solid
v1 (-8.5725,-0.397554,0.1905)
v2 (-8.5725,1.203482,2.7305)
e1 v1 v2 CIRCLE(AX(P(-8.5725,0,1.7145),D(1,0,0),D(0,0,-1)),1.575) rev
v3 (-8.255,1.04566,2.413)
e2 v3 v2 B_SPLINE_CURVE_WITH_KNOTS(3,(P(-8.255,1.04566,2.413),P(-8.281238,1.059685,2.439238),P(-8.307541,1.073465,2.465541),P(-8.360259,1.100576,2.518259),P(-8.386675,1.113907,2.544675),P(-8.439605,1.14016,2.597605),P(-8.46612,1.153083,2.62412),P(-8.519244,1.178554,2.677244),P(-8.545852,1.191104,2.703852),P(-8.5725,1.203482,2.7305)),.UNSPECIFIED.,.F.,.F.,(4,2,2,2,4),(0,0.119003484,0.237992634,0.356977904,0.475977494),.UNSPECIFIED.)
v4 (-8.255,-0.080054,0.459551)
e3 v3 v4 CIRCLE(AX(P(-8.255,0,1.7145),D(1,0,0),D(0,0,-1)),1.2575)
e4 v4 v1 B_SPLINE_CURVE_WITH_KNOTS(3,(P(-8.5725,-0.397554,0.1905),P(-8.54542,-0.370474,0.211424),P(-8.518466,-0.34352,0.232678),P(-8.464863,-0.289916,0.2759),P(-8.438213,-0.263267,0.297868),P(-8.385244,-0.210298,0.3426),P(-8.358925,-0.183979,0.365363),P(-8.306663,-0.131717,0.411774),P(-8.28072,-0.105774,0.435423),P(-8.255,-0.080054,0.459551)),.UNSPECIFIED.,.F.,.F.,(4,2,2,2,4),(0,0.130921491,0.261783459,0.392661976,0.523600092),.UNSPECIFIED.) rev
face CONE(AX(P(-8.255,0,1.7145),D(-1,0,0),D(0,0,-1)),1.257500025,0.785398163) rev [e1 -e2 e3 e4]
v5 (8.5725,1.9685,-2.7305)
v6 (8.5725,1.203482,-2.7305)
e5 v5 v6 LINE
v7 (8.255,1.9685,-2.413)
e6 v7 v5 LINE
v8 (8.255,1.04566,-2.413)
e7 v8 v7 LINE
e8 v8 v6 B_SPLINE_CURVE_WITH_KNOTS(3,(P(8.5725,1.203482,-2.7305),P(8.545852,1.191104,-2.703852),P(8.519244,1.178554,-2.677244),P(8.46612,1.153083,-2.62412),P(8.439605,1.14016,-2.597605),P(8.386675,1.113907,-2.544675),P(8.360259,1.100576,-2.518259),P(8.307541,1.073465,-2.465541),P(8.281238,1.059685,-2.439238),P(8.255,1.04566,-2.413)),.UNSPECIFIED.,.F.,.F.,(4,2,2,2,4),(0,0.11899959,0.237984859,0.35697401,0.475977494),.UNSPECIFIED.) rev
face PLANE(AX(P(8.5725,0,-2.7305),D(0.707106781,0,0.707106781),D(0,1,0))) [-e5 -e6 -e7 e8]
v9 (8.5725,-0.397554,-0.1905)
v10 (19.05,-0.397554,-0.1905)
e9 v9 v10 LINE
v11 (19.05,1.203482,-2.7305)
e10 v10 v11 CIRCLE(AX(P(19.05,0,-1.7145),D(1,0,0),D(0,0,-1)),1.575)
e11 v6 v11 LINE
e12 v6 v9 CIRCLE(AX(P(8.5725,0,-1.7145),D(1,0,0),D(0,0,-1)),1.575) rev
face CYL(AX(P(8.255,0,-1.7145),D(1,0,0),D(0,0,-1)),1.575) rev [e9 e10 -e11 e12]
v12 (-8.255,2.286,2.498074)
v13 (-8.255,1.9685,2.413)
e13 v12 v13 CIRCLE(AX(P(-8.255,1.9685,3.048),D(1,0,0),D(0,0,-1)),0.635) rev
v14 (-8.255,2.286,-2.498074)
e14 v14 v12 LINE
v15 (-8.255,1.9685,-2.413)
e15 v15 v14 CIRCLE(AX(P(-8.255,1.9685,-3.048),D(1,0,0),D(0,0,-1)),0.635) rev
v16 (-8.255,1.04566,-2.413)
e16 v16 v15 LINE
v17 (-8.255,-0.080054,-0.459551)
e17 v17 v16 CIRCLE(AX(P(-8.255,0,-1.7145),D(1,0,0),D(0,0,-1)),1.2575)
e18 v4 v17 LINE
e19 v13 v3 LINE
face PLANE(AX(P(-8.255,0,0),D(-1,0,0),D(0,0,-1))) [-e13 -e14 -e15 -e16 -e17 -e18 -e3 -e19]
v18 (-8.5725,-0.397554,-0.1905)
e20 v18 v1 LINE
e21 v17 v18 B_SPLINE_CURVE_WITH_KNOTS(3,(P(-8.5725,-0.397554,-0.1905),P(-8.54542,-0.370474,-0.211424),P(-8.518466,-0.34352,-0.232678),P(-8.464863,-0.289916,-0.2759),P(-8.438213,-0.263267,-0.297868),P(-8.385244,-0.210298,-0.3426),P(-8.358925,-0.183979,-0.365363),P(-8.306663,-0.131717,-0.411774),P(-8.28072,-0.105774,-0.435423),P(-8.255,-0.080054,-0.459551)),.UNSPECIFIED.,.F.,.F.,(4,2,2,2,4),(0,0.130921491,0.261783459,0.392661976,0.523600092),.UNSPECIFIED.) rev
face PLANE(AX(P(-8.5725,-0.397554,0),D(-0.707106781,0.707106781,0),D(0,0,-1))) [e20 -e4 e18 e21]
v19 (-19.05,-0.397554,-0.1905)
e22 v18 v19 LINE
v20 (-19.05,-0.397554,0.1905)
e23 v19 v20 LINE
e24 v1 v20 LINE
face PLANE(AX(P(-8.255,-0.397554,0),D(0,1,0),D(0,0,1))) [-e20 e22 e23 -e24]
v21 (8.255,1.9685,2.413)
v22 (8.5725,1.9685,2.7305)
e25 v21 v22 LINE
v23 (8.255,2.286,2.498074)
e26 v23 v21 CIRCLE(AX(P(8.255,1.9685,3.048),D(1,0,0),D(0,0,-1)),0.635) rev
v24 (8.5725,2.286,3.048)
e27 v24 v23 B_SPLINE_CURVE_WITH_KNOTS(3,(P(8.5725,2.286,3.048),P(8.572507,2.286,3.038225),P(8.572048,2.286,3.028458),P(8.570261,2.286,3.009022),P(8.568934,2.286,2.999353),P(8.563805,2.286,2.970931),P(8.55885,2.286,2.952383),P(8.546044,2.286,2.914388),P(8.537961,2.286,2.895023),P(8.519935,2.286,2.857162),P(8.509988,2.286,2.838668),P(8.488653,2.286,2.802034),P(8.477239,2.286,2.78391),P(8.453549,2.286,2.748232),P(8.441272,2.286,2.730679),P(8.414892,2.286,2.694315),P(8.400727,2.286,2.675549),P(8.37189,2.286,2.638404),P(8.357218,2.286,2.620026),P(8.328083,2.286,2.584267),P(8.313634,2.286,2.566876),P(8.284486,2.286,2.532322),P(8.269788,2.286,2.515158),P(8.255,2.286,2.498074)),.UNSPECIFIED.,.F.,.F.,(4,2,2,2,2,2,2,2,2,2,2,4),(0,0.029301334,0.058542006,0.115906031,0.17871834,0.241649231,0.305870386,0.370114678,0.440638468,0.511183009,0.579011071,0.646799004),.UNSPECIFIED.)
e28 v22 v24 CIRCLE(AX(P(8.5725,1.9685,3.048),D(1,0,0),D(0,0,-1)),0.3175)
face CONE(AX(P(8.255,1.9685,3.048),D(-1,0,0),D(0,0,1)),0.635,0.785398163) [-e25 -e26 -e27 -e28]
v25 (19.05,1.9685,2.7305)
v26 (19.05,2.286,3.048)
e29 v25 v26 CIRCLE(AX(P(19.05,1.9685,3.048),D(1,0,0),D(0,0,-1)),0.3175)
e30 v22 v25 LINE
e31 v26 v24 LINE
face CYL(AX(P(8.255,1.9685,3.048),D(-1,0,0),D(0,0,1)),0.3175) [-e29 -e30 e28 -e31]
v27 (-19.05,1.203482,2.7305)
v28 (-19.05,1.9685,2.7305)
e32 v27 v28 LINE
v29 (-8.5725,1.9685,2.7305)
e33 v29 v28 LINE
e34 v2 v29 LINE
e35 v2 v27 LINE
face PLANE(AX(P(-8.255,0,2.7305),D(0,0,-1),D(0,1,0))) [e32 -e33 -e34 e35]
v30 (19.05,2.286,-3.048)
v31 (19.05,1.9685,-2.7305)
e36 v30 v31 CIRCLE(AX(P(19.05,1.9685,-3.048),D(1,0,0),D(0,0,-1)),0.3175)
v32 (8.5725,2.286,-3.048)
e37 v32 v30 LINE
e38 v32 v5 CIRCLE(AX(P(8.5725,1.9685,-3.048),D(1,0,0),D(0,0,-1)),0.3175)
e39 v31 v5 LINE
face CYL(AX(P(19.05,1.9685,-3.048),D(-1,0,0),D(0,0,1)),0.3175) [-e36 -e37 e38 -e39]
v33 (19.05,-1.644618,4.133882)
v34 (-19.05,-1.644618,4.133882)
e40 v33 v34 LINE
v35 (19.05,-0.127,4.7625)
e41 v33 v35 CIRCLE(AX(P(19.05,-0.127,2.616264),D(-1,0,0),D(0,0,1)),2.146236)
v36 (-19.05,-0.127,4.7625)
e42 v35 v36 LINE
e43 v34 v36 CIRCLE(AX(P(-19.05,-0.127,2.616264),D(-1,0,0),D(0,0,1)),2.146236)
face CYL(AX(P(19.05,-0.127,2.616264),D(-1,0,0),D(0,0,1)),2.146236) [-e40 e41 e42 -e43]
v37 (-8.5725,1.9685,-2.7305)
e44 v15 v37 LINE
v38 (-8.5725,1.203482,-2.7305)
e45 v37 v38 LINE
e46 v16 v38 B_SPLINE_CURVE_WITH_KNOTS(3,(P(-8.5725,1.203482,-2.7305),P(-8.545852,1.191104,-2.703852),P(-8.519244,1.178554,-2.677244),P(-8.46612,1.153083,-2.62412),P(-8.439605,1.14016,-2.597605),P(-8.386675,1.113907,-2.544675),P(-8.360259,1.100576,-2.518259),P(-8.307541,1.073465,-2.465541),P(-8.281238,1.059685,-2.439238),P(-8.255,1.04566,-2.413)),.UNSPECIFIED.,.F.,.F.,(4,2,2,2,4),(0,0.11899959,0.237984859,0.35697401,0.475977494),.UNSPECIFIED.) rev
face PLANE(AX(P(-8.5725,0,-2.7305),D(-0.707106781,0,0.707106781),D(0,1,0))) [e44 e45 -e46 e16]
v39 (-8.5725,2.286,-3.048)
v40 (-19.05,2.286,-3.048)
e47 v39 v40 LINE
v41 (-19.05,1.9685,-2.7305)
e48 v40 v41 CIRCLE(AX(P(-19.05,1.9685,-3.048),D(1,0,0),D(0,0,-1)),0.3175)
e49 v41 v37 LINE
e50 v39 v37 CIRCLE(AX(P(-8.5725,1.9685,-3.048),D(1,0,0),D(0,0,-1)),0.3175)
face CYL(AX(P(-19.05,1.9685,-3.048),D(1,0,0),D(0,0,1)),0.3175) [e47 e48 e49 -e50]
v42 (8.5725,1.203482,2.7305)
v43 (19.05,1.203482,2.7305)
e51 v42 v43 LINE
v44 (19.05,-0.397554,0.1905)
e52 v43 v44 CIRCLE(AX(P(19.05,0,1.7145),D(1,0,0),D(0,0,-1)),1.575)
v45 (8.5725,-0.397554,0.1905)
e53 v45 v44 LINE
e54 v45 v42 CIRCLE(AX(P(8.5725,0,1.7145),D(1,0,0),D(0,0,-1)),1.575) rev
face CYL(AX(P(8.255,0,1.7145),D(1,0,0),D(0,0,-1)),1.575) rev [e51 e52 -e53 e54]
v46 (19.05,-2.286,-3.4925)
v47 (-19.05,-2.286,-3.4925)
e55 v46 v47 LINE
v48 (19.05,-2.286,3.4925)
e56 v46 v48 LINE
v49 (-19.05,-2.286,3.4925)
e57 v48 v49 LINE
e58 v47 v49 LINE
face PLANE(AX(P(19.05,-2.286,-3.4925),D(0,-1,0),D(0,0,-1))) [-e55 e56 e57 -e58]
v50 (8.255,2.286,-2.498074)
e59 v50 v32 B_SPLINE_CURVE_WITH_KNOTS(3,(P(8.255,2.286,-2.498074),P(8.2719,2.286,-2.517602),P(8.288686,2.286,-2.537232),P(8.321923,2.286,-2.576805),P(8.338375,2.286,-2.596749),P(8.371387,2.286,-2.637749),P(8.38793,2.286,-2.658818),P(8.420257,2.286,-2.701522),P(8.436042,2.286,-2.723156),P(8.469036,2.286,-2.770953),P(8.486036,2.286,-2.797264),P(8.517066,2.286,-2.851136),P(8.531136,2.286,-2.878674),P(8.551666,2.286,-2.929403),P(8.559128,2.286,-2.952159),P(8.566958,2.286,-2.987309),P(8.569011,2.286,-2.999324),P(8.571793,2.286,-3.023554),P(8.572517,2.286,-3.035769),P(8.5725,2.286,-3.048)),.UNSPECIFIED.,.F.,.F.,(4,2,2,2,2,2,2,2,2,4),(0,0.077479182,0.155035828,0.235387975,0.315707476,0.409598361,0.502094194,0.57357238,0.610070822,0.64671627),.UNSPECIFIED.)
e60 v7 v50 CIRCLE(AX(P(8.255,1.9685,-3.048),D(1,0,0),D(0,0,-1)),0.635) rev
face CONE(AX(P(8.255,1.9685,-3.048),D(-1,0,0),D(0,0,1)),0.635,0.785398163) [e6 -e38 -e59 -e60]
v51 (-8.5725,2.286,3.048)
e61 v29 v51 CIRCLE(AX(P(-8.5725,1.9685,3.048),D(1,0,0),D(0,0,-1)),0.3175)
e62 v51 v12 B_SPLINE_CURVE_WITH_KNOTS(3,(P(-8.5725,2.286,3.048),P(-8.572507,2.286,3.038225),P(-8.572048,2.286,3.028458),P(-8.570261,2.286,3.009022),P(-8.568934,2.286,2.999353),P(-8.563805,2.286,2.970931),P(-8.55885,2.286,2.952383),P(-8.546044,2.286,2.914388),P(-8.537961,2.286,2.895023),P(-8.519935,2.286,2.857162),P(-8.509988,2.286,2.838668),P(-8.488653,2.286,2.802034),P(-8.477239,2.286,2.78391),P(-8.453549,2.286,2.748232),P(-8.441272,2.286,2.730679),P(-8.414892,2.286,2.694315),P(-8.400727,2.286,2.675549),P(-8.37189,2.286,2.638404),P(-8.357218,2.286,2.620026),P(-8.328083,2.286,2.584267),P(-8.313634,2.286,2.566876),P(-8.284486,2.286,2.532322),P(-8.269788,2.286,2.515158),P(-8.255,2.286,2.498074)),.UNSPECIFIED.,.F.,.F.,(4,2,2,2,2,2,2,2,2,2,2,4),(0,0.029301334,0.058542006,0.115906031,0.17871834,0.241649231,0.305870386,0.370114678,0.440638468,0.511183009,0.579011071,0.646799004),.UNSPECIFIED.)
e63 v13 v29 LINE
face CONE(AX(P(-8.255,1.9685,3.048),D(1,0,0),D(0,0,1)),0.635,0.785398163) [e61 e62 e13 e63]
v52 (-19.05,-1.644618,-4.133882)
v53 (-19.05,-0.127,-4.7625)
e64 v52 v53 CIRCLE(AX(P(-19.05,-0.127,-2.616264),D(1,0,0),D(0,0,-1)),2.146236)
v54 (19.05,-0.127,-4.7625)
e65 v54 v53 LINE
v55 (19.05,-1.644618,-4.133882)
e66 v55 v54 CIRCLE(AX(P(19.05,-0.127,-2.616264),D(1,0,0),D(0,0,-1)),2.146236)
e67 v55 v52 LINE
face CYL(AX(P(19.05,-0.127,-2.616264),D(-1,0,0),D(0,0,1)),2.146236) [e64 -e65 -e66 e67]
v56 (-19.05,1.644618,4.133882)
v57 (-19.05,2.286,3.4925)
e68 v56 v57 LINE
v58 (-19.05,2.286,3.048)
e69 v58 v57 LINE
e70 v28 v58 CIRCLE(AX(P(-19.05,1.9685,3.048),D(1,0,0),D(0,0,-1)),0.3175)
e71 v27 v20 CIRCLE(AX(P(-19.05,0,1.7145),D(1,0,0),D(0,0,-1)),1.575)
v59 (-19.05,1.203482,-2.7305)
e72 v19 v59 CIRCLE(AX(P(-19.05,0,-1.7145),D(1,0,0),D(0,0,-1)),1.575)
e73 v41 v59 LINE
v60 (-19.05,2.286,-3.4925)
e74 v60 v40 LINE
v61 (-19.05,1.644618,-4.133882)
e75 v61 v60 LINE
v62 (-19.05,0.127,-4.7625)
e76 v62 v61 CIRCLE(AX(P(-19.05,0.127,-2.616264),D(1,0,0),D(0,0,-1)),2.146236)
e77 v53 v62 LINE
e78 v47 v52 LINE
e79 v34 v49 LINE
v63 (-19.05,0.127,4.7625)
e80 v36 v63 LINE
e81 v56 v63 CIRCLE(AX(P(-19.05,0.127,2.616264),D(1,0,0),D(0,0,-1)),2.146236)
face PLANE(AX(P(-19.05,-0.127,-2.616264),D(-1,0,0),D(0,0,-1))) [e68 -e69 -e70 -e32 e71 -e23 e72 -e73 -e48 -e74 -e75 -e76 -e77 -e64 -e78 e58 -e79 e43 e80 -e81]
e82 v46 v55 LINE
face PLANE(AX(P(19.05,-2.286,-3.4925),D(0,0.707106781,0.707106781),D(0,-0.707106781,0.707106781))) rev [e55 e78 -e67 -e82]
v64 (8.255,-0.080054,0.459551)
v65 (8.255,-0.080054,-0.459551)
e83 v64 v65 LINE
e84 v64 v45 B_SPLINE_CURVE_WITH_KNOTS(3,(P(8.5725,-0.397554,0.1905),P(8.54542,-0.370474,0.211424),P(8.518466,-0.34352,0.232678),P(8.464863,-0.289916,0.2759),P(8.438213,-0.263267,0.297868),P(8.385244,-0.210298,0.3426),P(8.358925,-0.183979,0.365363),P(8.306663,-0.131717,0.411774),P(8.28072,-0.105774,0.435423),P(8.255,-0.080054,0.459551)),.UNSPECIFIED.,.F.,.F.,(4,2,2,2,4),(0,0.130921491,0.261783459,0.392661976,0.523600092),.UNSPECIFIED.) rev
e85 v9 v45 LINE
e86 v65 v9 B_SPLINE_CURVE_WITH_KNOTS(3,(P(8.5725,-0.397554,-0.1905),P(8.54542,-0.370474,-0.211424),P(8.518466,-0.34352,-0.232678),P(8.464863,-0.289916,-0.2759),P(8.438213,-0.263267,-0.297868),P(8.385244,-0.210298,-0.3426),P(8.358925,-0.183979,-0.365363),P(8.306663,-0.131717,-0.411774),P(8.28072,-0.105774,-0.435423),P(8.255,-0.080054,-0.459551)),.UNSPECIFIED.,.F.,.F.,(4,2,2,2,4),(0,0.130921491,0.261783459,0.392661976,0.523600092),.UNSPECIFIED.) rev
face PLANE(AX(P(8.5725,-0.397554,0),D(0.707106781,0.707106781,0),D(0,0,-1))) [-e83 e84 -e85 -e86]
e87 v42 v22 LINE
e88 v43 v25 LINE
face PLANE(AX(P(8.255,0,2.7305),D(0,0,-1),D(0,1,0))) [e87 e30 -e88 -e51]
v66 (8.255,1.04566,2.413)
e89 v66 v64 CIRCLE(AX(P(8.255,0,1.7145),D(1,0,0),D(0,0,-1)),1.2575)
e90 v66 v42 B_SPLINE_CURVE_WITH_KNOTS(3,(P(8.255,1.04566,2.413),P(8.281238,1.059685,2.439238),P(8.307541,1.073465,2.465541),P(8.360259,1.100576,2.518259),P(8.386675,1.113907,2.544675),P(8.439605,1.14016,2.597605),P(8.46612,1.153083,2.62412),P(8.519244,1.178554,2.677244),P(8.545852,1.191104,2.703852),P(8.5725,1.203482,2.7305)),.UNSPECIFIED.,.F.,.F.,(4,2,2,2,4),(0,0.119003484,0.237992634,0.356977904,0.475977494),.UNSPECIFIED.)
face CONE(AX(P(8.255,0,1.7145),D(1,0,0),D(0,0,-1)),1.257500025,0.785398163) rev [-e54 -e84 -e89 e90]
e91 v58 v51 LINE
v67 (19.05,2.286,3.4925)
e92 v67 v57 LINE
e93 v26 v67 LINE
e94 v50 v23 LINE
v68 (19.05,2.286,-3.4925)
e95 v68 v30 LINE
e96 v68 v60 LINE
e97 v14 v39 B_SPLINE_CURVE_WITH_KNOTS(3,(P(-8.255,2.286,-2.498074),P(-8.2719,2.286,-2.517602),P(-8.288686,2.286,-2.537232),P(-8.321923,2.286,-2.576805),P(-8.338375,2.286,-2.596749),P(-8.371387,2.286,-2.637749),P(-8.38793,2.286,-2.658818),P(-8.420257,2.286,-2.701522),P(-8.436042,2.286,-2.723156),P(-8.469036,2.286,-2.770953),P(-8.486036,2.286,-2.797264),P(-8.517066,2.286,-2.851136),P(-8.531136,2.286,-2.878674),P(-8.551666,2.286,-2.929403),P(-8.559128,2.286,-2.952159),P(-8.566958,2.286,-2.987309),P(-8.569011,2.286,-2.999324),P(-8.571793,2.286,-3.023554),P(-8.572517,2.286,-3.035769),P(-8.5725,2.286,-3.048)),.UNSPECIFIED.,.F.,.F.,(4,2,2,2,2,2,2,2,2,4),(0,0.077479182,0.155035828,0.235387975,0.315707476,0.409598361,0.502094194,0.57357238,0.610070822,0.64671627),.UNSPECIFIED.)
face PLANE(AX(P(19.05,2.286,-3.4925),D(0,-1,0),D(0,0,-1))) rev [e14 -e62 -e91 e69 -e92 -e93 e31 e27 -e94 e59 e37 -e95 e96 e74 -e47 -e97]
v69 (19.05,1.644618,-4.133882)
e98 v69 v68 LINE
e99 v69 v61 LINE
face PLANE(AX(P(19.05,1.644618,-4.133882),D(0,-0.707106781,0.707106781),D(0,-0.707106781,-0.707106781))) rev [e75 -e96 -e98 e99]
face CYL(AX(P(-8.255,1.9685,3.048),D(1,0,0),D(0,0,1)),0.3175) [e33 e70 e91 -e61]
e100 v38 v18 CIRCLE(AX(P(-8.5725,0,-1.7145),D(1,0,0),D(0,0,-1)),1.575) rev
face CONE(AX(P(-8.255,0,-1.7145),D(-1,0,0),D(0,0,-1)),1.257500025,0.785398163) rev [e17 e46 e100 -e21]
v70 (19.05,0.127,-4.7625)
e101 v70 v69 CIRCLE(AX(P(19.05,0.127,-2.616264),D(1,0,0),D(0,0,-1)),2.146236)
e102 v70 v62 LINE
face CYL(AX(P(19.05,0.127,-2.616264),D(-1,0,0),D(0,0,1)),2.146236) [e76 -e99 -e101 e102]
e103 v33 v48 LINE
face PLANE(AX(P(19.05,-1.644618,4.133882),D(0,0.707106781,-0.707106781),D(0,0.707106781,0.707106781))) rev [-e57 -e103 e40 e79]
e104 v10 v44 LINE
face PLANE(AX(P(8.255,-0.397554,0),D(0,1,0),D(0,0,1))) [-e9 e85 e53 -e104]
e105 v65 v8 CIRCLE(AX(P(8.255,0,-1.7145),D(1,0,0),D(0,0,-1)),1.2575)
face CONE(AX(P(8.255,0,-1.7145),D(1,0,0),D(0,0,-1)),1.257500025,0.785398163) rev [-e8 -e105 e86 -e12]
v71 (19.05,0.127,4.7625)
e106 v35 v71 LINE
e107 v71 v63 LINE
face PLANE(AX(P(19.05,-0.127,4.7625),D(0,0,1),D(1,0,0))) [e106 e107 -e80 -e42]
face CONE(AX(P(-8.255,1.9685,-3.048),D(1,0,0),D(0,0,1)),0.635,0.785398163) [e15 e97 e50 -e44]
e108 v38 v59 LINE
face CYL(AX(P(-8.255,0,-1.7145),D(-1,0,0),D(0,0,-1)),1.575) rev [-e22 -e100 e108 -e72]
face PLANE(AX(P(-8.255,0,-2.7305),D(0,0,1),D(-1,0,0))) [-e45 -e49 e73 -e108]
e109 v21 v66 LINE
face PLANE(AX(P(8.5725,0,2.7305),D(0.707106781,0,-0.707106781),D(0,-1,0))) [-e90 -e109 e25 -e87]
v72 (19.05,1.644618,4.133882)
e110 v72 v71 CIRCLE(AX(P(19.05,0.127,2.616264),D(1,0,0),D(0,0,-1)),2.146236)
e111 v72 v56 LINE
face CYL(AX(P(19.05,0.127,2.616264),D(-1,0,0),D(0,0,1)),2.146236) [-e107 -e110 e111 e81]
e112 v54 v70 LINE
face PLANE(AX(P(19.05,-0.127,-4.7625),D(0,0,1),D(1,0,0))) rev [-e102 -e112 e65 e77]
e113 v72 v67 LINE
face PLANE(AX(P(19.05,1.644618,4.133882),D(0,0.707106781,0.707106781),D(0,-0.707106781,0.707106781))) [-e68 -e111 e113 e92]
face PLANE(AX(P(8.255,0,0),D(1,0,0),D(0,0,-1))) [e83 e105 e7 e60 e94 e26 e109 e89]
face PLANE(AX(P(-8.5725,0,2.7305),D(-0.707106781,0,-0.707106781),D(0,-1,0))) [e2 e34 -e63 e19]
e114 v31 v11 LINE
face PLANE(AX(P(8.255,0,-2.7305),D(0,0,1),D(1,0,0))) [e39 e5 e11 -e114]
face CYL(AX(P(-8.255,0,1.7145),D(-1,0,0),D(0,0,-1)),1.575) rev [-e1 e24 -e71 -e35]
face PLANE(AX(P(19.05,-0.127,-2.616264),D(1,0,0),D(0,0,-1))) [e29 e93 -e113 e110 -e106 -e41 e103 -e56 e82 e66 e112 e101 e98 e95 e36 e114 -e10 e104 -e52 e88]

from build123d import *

# Parameters (mm, degrees)
BOSS_EXTRUDE1_DEPTH = 19.05
CUT_EXTRUDE1_DEPTH  = 10.795
FILLET1_R           = 0.3175
CHAMFER1_SIZE       = 0.3175


with BuildPart() as part:
    # Sketch1 → Boss-Extrude1 (new body)
    with BuildSketch(Plane(origin=(0, 0, 0), x_dir=(0, 0, -1), z_dir=(1, 0, 0))):
        with BuildLine():
            Line((3.4925, -2.286), (-3.4925, -2.286))
            Line((-3.4925, -2.286), (-4.133882072, -1.644617928))
            ThreePointArc((-4.133882072, -1.644617928), (-4.599127523, -0.948328904), (-4.7625, -0.127))
            Line((-4.7625, -0.127), (-4.7625, 0.127))
            ThreePointArc((-4.7625, 0.127), (-4.599127523, 0.948328904), (-4.133882072, 1.644617928))
            Line((-4.133882072, 1.644617928), (-3.4925, 2.286))
            Line((-3.4925, 2.286), (3.4925, 2.286))
            Line((3.4925, 2.286), (4.133882072, 1.644617928))
            ThreePointArc((4.133882072, 1.644617928), (4.599127523, 0.948328904), (4.7625, 0.127))
            Line((4.7625, 0.127), (4.7625, -0.127))
            ThreePointArc((4.7625, -0.127), (4.599127523, -0.948328904), (4.133882072, -1.644617928))
            Line((4.133882072, -1.644617928), (3.4925, -2.286))
        make_face()
    extrude(amount=BOSS_EXTRUDE1_DEPTH)

    # Sketch2 → Cut-Extrude1 (cut)
    with BuildSketch(Plane(origin=(19.05, 0, 0), x_dir=(0, 0, -1), z_dir=(1, 0, 0))):
        with BuildLine():
            ThreePointArc((-0.139499975, 0), (-1.051014863, 1.428430101), (-2.7305, 1.203482064))
            Line((-2.7305, 1.203482064), (-0.1905, -0.397553869))
            ThreePointArc((-0.1905, -0.397553869), (-0.15230201, -0.200405889), (-0.139499975, 0))
        make_face()
        with BuildLine():
            Line((-0.1905, -0.397553869), (-2.7305, 1.203482064))
            ThreePointArc((-2.7305, 1.203482064), (-2.554348209, -1.332396361), (-0.1905, -0.397553869))
        make_face()
        with BuildLine():
            Line((-2.7305, 2.286), (-2.7305, 1.203482064))
            ThreePointArc((-2.7305, 1.203482064), (-1.051014863, 1.428430101), (-0.139499975, 0))
            ThreePointArc((-0.139499975, 0), (-0.15230201, -0.200405889), (-0.1905, -0.397553869))
            Line((-0.1905, -0.397553869), (0.1905, -0.397553869))
            ThreePointArc((0.1905, -0.397553869), (0.874651791, 1.332396361), (2.7305, 1.203482064))
            Line((2.7305, 1.203482064), (2.7305, 2.286))
            Line((2.7305, 2.286), (-2.7305, 2.286))
        make_face()
        with BuildLine():
            ThreePointArc((2.7305, 1.203482064), (0.874651791, 1.332396361), (0.1905, -0.397553869))
            Line((0.1905, -0.397553869), (2.7305, 1.203482064))
        make_face()
        with BuildLine():
            Line((2.7305, 1.203482064), (0.1905, -0.397553869))
            ThreePointArc((0.1905, -0.397553869), (1.914905889, -1.56219799), (3.289500025, 0))
            ThreePointArc((3.289500025, 0), (3.142930101, 0.663485137), (2.7305, 1.203482064))
        make_face()
    extrude(amount=-CUT_EXTRUDE1_DEPTH, mode=Mode.SUBTRACT)

    # Fillet1
    fillet1_edges = [part.edges().sort_by_distance(p)[0] for p in [
        (13.6525, 2.286, 2.7305),
        (13.6525, 2.286, -2.7305),
    ]]
    fillet(fillet1_edges, radius=FILLET1_R)

    # Chamfer1
    chamfer1_edges = [part.edges().sort_by_distance(p)[0] for p in [
        (8.255, -0.397553869, 0),
    ]]
    chamfer(chamfer1_edges, length=CHAMFER1_SIZE)
    chamfer1_2_edges = [part.edges().sort_by_distance(p)[0] for p in [
        (8.255, 2.193006403, 2.823493597),
        (8.255, 1.585991032, 2.7305),
    ]]
    chamfer(chamfer1_2_edges, length=CHAMFER1_SIZE)
    chamfer1_3_edges = [part.edges().sort_by_distance(p)[0] for p in [
        (8.255, 1.585991032, -2.7305),
        (8.255, 2.193006403, -2.823493597),
    ]]
    chamfer(chamfer1_3_edges, length=CHAMFER1_SIZE)
    chamfer1_4_edges = [part.edges().sort_by_distance(p)[0] for p in [
        (8.255, -1.332396361, -2.554348209),
    ]]
    chamfer(chamfer1_4_edges, length=CHAMFER1_SIZE - 0.0001)  # a hair under: the kernel refuses the full size
    chamfer1_5_edges = [part.edges().sort_by_distance(p)[0] for p in [
        (8.255, -1.332396361, 2.554348209),
    ]]
    chamfer(chamfer1_5_edges, length=CHAMFER1_SIZE - 0.0001)  # a hair under: the kernel refuses the full size

    # Mirror1: part across plane


with BuildPart() as part_1:
    add(part.part)
    add(part.part.mirror(Plane(origin=(0, 0, 0), x_dir=(0, 0, 1), z_dir=(1, 0, 0))))


solid = part_1.part
